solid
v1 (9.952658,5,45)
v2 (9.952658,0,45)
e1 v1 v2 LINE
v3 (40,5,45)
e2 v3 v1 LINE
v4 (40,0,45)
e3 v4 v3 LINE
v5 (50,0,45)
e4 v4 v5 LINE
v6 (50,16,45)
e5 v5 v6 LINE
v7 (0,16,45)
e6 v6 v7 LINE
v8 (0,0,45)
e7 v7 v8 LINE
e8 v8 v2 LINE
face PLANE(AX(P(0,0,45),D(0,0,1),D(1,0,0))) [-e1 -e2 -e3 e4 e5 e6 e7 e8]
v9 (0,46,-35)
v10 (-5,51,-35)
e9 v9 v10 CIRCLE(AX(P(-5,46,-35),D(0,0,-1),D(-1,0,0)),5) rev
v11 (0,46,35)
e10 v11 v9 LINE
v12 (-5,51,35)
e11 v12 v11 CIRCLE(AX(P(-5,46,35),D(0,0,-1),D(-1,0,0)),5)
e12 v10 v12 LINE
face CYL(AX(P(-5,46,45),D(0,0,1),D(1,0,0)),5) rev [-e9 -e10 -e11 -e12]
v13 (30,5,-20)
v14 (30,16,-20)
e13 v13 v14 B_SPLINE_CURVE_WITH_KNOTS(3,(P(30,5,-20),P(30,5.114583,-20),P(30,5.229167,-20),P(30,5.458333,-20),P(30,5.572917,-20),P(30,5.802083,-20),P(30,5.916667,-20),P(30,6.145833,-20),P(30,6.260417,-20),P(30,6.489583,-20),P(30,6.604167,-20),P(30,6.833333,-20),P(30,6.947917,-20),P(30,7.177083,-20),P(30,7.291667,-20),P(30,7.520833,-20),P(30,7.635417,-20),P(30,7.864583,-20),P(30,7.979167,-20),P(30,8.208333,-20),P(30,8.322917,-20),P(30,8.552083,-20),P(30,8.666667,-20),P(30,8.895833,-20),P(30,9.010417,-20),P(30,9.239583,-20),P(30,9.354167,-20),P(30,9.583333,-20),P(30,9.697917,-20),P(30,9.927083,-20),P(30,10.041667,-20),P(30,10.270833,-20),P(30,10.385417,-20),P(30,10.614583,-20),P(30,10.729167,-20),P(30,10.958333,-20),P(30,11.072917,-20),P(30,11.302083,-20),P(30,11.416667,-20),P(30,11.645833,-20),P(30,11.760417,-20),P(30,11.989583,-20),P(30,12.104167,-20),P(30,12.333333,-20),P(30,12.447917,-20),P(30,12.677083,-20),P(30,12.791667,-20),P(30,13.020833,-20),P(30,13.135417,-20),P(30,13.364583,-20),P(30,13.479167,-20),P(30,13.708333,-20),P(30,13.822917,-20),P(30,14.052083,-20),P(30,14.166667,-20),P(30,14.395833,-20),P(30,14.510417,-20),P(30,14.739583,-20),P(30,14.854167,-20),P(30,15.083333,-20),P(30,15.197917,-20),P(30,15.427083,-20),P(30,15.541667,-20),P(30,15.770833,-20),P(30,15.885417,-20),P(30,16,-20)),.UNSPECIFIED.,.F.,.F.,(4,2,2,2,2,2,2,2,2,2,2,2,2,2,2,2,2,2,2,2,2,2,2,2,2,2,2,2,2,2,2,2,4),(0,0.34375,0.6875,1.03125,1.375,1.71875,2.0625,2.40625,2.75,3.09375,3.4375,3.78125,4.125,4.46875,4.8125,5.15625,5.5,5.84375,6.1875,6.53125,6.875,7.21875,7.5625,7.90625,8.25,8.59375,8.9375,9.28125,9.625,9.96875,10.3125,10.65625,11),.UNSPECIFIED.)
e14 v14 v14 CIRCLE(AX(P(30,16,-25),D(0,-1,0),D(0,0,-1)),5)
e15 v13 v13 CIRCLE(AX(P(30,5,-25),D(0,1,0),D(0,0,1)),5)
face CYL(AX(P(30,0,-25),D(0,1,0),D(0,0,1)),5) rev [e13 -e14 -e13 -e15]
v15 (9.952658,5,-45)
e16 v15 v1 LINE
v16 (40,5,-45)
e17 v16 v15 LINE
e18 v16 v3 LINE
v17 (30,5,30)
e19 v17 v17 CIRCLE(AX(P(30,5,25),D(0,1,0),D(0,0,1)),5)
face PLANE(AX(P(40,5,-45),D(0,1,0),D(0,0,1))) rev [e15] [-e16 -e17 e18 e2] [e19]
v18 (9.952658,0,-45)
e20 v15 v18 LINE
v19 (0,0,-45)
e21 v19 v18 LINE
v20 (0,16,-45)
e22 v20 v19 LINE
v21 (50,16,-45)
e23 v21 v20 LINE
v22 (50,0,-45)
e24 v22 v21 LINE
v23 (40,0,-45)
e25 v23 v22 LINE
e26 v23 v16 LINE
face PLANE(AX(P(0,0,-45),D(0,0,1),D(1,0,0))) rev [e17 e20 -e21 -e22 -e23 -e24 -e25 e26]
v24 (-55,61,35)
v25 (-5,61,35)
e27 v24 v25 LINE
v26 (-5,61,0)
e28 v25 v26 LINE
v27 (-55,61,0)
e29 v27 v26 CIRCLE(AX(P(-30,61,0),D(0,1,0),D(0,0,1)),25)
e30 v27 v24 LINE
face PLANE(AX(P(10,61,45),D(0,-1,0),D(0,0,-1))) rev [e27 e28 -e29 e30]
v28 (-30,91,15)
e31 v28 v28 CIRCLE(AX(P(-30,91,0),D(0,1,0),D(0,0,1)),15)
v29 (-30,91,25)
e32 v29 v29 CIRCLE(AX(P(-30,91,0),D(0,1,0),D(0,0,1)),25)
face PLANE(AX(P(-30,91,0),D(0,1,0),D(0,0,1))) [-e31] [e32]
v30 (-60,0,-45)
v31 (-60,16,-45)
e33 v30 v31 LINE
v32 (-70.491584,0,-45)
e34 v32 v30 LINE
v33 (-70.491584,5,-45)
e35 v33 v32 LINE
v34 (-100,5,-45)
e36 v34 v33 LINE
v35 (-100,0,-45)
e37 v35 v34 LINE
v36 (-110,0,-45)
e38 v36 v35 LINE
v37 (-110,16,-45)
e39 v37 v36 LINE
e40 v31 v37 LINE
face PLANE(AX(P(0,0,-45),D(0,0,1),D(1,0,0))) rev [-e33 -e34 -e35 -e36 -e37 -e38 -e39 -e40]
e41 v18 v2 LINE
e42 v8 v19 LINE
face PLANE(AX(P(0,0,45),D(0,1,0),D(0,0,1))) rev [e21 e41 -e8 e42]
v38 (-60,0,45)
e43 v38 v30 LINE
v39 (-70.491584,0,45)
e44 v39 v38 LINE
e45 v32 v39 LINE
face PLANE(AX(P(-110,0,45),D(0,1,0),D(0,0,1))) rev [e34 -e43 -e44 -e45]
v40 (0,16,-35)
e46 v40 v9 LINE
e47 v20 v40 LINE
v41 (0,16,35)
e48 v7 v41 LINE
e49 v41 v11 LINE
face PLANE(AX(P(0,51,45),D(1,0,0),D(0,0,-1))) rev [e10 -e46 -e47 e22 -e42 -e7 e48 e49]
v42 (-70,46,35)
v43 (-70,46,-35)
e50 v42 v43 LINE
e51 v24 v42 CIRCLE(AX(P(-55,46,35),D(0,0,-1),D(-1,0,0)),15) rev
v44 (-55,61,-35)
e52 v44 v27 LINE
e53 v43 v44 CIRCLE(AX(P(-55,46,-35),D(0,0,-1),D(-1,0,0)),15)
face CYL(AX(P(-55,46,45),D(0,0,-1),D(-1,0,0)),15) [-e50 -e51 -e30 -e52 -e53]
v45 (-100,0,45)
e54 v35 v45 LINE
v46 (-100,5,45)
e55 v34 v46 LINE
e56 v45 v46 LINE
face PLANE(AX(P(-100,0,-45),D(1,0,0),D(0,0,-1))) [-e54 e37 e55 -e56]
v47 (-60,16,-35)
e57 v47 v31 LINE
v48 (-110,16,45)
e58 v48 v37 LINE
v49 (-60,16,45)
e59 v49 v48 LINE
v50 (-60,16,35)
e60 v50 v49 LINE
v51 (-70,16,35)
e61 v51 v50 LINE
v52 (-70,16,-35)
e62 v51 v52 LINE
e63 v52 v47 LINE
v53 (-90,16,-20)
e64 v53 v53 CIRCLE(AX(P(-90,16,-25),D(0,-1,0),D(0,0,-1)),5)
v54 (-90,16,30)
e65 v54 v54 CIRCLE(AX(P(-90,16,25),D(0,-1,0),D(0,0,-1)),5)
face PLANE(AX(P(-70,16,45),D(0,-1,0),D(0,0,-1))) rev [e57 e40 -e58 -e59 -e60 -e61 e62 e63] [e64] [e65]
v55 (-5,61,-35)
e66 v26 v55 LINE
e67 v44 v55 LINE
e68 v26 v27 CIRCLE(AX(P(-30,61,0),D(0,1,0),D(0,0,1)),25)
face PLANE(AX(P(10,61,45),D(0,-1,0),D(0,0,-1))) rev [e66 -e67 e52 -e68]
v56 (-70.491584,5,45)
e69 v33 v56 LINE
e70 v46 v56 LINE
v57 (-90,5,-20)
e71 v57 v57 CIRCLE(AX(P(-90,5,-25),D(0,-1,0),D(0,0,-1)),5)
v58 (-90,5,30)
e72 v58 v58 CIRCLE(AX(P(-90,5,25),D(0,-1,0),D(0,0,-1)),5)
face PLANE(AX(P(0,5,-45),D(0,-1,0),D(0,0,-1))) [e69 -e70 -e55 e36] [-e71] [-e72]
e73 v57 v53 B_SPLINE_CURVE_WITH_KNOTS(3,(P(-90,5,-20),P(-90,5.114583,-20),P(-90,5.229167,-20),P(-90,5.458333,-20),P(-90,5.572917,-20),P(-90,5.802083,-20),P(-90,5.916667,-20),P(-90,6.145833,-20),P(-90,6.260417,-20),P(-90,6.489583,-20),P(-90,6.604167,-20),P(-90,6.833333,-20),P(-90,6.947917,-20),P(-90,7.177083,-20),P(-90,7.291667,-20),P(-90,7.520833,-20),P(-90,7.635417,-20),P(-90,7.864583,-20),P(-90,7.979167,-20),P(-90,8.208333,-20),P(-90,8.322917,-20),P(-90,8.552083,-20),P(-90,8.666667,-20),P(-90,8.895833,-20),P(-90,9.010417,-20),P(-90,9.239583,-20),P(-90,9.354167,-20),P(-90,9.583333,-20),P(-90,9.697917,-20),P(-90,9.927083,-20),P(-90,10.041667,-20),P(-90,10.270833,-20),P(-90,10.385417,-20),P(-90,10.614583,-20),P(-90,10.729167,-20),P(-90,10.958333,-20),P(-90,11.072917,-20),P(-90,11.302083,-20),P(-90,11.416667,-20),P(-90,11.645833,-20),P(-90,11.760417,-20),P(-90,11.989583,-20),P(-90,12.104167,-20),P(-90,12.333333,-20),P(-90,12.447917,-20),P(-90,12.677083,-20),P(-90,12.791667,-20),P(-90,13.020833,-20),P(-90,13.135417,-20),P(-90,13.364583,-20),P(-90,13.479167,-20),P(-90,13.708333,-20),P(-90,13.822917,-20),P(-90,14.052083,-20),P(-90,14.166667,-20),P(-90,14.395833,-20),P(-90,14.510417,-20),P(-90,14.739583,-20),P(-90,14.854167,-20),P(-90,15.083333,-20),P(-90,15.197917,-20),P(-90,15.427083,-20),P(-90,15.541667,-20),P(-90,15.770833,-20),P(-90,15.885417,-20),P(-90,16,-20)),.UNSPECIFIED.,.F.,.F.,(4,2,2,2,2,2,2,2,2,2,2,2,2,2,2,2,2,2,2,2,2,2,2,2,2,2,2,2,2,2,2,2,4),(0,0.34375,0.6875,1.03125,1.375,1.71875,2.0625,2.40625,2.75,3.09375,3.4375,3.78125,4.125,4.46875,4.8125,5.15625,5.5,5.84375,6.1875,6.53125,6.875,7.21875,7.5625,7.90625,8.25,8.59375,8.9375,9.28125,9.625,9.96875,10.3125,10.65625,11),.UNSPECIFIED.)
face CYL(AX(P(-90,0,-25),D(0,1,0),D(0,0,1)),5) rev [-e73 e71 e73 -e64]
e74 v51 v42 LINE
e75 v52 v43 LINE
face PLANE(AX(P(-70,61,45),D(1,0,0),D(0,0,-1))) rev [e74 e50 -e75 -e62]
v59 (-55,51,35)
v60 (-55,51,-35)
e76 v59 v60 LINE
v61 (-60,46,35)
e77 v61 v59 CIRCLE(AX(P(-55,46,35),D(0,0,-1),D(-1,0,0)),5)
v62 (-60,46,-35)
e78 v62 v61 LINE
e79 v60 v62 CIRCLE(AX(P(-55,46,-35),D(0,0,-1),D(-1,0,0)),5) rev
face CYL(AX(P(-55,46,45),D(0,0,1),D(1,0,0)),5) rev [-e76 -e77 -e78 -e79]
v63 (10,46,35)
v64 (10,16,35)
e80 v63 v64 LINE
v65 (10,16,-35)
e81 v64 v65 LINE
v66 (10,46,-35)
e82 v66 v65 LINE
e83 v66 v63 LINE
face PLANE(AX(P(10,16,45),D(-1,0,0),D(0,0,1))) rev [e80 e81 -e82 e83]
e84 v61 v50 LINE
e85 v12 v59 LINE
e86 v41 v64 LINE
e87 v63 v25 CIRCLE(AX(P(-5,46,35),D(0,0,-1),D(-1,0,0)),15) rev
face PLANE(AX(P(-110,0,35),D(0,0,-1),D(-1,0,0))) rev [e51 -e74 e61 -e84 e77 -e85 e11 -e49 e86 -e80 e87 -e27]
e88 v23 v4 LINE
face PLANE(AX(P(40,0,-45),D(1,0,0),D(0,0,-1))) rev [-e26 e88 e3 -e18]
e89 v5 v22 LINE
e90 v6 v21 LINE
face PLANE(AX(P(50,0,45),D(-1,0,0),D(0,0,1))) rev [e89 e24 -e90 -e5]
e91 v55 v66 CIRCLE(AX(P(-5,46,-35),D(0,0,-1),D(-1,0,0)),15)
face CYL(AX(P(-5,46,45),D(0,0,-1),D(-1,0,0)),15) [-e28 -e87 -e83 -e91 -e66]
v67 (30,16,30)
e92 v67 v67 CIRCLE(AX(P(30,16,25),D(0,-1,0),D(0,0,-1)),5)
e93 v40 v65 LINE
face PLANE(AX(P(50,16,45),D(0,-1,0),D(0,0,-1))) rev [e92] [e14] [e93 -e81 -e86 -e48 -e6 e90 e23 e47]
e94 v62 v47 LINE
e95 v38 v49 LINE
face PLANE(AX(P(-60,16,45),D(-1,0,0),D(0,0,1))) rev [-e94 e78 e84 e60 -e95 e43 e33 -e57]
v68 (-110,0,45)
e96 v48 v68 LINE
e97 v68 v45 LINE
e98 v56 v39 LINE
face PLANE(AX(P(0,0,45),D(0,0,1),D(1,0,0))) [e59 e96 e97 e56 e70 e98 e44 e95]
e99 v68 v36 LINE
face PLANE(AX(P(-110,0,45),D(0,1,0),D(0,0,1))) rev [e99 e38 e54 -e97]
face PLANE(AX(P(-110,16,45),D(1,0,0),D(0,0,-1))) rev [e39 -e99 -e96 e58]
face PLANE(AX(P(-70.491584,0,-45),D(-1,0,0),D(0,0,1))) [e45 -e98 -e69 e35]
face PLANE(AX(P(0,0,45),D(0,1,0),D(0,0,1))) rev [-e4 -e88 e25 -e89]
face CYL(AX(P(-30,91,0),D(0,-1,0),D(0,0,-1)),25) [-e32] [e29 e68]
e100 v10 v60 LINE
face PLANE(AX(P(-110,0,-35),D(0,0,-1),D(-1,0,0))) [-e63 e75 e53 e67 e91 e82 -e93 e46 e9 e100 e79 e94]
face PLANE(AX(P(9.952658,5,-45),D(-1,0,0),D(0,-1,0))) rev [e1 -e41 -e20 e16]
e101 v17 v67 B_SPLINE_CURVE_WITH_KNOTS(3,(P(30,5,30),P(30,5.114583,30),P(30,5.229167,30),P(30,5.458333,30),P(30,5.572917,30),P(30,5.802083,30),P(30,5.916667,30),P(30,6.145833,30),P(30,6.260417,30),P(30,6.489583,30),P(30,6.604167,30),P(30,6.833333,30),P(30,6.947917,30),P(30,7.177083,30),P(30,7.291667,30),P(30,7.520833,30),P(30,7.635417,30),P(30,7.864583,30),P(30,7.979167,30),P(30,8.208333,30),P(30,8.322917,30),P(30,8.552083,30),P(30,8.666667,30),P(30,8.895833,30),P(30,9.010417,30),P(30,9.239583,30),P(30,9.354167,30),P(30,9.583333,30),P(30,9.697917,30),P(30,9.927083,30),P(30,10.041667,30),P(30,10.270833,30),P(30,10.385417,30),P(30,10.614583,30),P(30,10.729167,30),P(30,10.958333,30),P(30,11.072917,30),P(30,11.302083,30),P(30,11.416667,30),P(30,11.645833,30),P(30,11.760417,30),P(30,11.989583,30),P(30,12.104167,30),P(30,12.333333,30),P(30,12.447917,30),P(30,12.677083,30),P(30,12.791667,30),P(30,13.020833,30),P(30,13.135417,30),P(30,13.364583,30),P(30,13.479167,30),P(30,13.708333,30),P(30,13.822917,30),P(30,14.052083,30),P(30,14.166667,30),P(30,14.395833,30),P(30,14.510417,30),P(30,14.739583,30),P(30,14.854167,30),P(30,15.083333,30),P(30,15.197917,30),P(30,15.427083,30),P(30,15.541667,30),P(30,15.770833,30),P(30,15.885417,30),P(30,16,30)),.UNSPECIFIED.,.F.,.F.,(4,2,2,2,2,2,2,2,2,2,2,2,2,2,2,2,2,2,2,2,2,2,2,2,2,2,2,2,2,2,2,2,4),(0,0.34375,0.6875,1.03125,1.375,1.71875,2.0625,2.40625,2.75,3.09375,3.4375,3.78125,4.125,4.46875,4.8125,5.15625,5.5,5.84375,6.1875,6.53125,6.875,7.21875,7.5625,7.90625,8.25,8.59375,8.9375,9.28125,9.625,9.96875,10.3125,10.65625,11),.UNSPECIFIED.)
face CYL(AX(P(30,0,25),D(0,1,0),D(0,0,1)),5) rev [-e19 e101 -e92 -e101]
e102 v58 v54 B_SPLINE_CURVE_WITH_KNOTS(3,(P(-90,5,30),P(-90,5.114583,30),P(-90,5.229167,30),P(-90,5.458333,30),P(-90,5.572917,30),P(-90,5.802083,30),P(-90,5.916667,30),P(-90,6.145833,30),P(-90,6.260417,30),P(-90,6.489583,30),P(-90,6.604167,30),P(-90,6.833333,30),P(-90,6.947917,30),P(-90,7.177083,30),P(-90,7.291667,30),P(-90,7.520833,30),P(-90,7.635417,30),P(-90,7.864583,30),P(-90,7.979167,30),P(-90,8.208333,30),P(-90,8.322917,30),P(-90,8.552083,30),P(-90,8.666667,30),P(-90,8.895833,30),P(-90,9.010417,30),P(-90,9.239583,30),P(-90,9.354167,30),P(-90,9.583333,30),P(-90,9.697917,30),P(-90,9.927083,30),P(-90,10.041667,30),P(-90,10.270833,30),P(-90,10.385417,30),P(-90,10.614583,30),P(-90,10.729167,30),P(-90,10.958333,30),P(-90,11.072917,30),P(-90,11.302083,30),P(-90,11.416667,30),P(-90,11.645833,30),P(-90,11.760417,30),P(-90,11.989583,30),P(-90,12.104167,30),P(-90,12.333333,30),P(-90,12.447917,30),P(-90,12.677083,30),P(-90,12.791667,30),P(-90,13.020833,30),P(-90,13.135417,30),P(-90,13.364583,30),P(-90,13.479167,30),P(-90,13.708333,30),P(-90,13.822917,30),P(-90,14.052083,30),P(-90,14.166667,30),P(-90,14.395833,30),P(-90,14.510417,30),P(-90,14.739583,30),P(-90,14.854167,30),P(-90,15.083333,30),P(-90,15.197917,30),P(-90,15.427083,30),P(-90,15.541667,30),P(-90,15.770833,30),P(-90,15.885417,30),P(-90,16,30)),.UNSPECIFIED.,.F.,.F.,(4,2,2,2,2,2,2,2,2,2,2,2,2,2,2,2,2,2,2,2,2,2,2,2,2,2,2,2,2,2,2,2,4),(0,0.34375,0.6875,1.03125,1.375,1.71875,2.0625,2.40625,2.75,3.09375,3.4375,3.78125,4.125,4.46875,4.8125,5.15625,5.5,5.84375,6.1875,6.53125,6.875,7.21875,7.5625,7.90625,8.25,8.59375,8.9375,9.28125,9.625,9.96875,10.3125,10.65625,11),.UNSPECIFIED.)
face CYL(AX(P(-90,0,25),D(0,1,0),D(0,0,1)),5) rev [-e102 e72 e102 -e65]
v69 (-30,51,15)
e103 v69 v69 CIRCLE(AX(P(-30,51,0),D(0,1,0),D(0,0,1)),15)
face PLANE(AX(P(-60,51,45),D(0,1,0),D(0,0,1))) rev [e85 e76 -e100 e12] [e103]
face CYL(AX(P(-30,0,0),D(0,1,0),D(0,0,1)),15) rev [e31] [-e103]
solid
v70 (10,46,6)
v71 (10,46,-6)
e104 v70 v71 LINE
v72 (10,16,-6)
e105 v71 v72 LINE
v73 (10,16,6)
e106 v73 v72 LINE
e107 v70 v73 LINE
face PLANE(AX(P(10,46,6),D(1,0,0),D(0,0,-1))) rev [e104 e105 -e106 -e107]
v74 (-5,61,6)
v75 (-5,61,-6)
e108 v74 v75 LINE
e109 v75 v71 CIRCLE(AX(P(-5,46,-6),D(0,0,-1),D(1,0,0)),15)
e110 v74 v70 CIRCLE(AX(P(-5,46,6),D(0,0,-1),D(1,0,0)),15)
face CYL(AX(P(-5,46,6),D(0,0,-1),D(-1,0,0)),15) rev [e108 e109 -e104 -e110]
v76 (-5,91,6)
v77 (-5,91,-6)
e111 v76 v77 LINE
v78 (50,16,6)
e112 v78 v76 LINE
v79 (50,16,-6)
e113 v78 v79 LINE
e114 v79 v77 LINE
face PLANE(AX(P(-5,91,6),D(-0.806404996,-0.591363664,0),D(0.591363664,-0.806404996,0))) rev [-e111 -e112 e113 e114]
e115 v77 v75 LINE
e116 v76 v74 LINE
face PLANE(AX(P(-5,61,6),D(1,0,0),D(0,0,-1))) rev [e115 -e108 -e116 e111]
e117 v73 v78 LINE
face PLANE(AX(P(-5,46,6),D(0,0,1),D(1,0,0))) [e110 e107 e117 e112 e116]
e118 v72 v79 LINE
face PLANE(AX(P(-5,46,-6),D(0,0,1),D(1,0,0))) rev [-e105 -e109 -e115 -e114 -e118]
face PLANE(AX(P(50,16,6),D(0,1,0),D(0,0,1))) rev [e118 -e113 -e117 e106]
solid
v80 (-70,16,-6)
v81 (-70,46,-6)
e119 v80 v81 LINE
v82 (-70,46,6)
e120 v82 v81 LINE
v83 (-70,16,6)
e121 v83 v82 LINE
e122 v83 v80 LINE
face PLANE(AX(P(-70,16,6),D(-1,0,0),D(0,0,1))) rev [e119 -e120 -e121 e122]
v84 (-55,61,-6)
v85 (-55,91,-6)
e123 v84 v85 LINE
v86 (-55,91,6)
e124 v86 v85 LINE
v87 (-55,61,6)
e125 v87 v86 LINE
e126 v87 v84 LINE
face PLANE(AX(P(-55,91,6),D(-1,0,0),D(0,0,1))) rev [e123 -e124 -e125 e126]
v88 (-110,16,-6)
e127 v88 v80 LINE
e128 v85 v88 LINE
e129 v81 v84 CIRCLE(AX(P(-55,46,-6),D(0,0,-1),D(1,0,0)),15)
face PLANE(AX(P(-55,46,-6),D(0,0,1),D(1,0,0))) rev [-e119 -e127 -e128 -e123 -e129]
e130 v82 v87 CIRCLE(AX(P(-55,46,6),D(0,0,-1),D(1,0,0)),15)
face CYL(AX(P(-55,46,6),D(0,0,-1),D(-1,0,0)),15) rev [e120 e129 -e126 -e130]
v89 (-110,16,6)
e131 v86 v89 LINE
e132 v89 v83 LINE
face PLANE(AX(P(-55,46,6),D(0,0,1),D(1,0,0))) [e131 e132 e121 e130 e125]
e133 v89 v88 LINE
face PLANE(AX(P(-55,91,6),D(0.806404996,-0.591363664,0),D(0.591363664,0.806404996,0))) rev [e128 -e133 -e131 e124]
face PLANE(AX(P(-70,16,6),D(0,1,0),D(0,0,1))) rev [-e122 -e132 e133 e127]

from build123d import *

# Parameters (mm, degrees)
BOSS_EXTRUDE1_DEPTH     = 45
SKETCH3_W               = 29.50841585
SKETCH3_H               = 5
SKETCH3_W_2             = 30.047341964
CUT_EXTRUDE1_DEPTH      = 155.664152278
CUT_EXTRUDE2_DEPTH      = 134.588921696
CUT_EXTRUDE2_DEPTH_BACK = 134.588921696
SKETCH4_W               = 10
SKETCH4_H               = 45
SKETCH6_R               = 25
BOSS_EXTRUDE2_DEPTH     = 30
SKETCH7_R               = 15
CUT_EXTRUDE4_DEPTH      = 150.686338722
FILLET1_R               = 15
FILLET2_R               = 5
FILLET3_R               = 15
FILLET4_R               = 5
BOSS_EXTRUDE3_DEPTH     = 6
BOSS_EXTRUDE3_2_DEPTH   = 6
CUT_EXTRUDE5_DEPTH      = 141.534693226
CUT_EXTRUDE5_DEPTH_BACK = 141.534693226
SKETCH16_R              = 5


with BuildPart() as part:
    # Sketch1 → Boss-Extrude1 (new, symmetric)
    with BuildSketch(Plane.XY):
        Polygon((0, 0), (50, 0), (50, 16), (10, 16), (10, 61), (-70, 61), (-70, 16), (-110, 16), (-110, 0), (-60, 0), (-60, 16), (-60, 51), (0, 51), (0, 3.811417612), align=None)
    extrude(amount=BOSS_EXTRUDE1_DEPTH, both=True)

    # Sketch3 → Cut-Extrude1 (cut, through all)
    with BuildSketch(Plane.XY.offset(45)):
        with Locations((-85.245792075, 2.5)):
            Rectangle(SKETCH3_W, SKETCH3_H)
        with Locations((24.976329018, 2.5)):
            Rectangle(SKETCH3_W_2, SKETCH3_H)
    extrude(amount=-CUT_EXTRUDE1_DEPTH, mode=Mode.SUBTRACT)

    # Sketch4 → Cut-Extrude2 (cut, two sides: drawn at the far end of the back side and taken through both)
    with BuildSketch(Plane(origin=(0, 0, 0), x_dir=(0, 0, -1), z_dir=(1, 0, 0)).offset(-CUT_EXTRUDE2_DEPTH_BACK)):
        with Locations((40, 38.5)):
            Rectangle(SKETCH4_W, SKETCH4_H)
        with Locations((-40, 38.5)):
            Rectangle(SKETCH4_W, SKETCH4_H)
    extrude(amount=CUT_EXTRUDE2_DEPTH + CUT_EXTRUDE2_DEPTH_BACK, mode=Mode.SUBTRACT)

    # Sketch6 → Boss-Extrude2 (add)
    with BuildSketch(Plane(origin=(0, 61, 0), x_dir=(1, 0, 0), z_dir=(0, 1, 0))):
        with Locations(Location((-30, 0, 0), (0, 0, 270))):
            Circle(SKETCH6_R)
    extrude(amount=BOSS_EXTRUDE2_DEPTH)

    # Sketch7 → Cut-Extrude4 (cut, through all)
    with BuildSketch(Plane(origin=(0, 91, 0), x_dir=(1, 0, 0), z_dir=(0, 1, 0))):
        with Locations(Location((-30, 0, 0), (0, 0, 270))):
            Circle(SKETCH7_R)
    extrude(amount=-CUT_EXTRUDE4_DEPTH, mode=Mode.SUBTRACT)

    # Fillet1
    fillet1_edges = [part.edges().sort_by_distance(p)[0] for p in [
        (-70, 61, 0),
    ]]
    fillet(fillet1_edges, radius=FILLET1_R - 0.0001)  # a hair under: the kernel refuses the full size

    # Fillet2
    fillet2_edges = [part.edges().sort_by_distance(p)[0] for p in [
        (-60, 51, 0),
    ]]
    fillet(fillet2_edges, radius=FILLET2_R)

    # Fillet3
    fillet3_edges = [part.edges().sort_by_distance(p)[0] for p in [
        (10, 61, 0),
    ]]
    fillet(fillet3_edges, radius=FILLET3_R)

    # Fillet4
    fillet4_edges = [part.edges().sort_by_distance(p)[0] for p in [
        (0, 51, 0),
    ]]
    fillet(fillet4_edges, radius=FILLET4_R)

    # Sketch16 → Cut-Extrude5 (cut, two sides: drawn at the far end of the back side and taken through both)
    with BuildSketch(Plane(origin=(0, 16, 0), x_dir=(1, 0, 0), z_dir=(0, 1, 0)).offset(-CUT_EXTRUDE5_DEPTH_BACK)):
        with Locations(Location((-90, 25, 0), (0, 0, 270))):
            Circle(SKETCH16_R)
        with Locations(Location((-90, -25, 0), (0, 0, 270))):
            Circle(SKETCH16_R)
        with Locations(Location((30, 25, 0), (0, 0, 270))):
            Circle(SKETCH16_R)
        with Locations(Location((30, -25, 0), (0, 0, 270))):
            Circle(SKETCH16_R)
    extrude(amount=CUT_EXTRUDE5_DEPTH + CUT_EXTRUDE5_DEPTH_BACK, mode=Mode.SUBTRACT)


with BuildPart() as body_2:
    # Sketch12 → Boss-Extrude3 (new, symmetric)
    with BuildSketch(Plane.XY):
        with BuildLine():
            Line((-55, 91), (-110, 16))
            Line((-110, 16), (-70, 16))
            Line((-70, 16), (-70, 46))
            ThreePointArc((-70, 46), (-65.606601718, 56.606601718), (-55, 61))
            Line((-55, 61), (-55, 91))
        make_face()
    extrude(amount=BOSS_EXTRUDE3_DEPTH, both=True)


with BuildPart() as body_3:
    # Sketch12 → Boss-Extrude3 2 (new, symmetric)
    with BuildSketch(Plane.XY):
        with BuildLine():
            Line((50, 16), (10, 16))
            Line((10, 16), (10, 46))
            ThreePointArc((10, 46), (5.606601718, 56.606601718), (-5, 61))
            Line((-5, 61), (-5, 91))
            Line((-5, 91), (50, 16))
        make_face()
    extrude(amount=BOSS_EXTRUDE3_2_DEPTH, both=True)


solid = Compound([part.part, body_2.part, body_3.part])
